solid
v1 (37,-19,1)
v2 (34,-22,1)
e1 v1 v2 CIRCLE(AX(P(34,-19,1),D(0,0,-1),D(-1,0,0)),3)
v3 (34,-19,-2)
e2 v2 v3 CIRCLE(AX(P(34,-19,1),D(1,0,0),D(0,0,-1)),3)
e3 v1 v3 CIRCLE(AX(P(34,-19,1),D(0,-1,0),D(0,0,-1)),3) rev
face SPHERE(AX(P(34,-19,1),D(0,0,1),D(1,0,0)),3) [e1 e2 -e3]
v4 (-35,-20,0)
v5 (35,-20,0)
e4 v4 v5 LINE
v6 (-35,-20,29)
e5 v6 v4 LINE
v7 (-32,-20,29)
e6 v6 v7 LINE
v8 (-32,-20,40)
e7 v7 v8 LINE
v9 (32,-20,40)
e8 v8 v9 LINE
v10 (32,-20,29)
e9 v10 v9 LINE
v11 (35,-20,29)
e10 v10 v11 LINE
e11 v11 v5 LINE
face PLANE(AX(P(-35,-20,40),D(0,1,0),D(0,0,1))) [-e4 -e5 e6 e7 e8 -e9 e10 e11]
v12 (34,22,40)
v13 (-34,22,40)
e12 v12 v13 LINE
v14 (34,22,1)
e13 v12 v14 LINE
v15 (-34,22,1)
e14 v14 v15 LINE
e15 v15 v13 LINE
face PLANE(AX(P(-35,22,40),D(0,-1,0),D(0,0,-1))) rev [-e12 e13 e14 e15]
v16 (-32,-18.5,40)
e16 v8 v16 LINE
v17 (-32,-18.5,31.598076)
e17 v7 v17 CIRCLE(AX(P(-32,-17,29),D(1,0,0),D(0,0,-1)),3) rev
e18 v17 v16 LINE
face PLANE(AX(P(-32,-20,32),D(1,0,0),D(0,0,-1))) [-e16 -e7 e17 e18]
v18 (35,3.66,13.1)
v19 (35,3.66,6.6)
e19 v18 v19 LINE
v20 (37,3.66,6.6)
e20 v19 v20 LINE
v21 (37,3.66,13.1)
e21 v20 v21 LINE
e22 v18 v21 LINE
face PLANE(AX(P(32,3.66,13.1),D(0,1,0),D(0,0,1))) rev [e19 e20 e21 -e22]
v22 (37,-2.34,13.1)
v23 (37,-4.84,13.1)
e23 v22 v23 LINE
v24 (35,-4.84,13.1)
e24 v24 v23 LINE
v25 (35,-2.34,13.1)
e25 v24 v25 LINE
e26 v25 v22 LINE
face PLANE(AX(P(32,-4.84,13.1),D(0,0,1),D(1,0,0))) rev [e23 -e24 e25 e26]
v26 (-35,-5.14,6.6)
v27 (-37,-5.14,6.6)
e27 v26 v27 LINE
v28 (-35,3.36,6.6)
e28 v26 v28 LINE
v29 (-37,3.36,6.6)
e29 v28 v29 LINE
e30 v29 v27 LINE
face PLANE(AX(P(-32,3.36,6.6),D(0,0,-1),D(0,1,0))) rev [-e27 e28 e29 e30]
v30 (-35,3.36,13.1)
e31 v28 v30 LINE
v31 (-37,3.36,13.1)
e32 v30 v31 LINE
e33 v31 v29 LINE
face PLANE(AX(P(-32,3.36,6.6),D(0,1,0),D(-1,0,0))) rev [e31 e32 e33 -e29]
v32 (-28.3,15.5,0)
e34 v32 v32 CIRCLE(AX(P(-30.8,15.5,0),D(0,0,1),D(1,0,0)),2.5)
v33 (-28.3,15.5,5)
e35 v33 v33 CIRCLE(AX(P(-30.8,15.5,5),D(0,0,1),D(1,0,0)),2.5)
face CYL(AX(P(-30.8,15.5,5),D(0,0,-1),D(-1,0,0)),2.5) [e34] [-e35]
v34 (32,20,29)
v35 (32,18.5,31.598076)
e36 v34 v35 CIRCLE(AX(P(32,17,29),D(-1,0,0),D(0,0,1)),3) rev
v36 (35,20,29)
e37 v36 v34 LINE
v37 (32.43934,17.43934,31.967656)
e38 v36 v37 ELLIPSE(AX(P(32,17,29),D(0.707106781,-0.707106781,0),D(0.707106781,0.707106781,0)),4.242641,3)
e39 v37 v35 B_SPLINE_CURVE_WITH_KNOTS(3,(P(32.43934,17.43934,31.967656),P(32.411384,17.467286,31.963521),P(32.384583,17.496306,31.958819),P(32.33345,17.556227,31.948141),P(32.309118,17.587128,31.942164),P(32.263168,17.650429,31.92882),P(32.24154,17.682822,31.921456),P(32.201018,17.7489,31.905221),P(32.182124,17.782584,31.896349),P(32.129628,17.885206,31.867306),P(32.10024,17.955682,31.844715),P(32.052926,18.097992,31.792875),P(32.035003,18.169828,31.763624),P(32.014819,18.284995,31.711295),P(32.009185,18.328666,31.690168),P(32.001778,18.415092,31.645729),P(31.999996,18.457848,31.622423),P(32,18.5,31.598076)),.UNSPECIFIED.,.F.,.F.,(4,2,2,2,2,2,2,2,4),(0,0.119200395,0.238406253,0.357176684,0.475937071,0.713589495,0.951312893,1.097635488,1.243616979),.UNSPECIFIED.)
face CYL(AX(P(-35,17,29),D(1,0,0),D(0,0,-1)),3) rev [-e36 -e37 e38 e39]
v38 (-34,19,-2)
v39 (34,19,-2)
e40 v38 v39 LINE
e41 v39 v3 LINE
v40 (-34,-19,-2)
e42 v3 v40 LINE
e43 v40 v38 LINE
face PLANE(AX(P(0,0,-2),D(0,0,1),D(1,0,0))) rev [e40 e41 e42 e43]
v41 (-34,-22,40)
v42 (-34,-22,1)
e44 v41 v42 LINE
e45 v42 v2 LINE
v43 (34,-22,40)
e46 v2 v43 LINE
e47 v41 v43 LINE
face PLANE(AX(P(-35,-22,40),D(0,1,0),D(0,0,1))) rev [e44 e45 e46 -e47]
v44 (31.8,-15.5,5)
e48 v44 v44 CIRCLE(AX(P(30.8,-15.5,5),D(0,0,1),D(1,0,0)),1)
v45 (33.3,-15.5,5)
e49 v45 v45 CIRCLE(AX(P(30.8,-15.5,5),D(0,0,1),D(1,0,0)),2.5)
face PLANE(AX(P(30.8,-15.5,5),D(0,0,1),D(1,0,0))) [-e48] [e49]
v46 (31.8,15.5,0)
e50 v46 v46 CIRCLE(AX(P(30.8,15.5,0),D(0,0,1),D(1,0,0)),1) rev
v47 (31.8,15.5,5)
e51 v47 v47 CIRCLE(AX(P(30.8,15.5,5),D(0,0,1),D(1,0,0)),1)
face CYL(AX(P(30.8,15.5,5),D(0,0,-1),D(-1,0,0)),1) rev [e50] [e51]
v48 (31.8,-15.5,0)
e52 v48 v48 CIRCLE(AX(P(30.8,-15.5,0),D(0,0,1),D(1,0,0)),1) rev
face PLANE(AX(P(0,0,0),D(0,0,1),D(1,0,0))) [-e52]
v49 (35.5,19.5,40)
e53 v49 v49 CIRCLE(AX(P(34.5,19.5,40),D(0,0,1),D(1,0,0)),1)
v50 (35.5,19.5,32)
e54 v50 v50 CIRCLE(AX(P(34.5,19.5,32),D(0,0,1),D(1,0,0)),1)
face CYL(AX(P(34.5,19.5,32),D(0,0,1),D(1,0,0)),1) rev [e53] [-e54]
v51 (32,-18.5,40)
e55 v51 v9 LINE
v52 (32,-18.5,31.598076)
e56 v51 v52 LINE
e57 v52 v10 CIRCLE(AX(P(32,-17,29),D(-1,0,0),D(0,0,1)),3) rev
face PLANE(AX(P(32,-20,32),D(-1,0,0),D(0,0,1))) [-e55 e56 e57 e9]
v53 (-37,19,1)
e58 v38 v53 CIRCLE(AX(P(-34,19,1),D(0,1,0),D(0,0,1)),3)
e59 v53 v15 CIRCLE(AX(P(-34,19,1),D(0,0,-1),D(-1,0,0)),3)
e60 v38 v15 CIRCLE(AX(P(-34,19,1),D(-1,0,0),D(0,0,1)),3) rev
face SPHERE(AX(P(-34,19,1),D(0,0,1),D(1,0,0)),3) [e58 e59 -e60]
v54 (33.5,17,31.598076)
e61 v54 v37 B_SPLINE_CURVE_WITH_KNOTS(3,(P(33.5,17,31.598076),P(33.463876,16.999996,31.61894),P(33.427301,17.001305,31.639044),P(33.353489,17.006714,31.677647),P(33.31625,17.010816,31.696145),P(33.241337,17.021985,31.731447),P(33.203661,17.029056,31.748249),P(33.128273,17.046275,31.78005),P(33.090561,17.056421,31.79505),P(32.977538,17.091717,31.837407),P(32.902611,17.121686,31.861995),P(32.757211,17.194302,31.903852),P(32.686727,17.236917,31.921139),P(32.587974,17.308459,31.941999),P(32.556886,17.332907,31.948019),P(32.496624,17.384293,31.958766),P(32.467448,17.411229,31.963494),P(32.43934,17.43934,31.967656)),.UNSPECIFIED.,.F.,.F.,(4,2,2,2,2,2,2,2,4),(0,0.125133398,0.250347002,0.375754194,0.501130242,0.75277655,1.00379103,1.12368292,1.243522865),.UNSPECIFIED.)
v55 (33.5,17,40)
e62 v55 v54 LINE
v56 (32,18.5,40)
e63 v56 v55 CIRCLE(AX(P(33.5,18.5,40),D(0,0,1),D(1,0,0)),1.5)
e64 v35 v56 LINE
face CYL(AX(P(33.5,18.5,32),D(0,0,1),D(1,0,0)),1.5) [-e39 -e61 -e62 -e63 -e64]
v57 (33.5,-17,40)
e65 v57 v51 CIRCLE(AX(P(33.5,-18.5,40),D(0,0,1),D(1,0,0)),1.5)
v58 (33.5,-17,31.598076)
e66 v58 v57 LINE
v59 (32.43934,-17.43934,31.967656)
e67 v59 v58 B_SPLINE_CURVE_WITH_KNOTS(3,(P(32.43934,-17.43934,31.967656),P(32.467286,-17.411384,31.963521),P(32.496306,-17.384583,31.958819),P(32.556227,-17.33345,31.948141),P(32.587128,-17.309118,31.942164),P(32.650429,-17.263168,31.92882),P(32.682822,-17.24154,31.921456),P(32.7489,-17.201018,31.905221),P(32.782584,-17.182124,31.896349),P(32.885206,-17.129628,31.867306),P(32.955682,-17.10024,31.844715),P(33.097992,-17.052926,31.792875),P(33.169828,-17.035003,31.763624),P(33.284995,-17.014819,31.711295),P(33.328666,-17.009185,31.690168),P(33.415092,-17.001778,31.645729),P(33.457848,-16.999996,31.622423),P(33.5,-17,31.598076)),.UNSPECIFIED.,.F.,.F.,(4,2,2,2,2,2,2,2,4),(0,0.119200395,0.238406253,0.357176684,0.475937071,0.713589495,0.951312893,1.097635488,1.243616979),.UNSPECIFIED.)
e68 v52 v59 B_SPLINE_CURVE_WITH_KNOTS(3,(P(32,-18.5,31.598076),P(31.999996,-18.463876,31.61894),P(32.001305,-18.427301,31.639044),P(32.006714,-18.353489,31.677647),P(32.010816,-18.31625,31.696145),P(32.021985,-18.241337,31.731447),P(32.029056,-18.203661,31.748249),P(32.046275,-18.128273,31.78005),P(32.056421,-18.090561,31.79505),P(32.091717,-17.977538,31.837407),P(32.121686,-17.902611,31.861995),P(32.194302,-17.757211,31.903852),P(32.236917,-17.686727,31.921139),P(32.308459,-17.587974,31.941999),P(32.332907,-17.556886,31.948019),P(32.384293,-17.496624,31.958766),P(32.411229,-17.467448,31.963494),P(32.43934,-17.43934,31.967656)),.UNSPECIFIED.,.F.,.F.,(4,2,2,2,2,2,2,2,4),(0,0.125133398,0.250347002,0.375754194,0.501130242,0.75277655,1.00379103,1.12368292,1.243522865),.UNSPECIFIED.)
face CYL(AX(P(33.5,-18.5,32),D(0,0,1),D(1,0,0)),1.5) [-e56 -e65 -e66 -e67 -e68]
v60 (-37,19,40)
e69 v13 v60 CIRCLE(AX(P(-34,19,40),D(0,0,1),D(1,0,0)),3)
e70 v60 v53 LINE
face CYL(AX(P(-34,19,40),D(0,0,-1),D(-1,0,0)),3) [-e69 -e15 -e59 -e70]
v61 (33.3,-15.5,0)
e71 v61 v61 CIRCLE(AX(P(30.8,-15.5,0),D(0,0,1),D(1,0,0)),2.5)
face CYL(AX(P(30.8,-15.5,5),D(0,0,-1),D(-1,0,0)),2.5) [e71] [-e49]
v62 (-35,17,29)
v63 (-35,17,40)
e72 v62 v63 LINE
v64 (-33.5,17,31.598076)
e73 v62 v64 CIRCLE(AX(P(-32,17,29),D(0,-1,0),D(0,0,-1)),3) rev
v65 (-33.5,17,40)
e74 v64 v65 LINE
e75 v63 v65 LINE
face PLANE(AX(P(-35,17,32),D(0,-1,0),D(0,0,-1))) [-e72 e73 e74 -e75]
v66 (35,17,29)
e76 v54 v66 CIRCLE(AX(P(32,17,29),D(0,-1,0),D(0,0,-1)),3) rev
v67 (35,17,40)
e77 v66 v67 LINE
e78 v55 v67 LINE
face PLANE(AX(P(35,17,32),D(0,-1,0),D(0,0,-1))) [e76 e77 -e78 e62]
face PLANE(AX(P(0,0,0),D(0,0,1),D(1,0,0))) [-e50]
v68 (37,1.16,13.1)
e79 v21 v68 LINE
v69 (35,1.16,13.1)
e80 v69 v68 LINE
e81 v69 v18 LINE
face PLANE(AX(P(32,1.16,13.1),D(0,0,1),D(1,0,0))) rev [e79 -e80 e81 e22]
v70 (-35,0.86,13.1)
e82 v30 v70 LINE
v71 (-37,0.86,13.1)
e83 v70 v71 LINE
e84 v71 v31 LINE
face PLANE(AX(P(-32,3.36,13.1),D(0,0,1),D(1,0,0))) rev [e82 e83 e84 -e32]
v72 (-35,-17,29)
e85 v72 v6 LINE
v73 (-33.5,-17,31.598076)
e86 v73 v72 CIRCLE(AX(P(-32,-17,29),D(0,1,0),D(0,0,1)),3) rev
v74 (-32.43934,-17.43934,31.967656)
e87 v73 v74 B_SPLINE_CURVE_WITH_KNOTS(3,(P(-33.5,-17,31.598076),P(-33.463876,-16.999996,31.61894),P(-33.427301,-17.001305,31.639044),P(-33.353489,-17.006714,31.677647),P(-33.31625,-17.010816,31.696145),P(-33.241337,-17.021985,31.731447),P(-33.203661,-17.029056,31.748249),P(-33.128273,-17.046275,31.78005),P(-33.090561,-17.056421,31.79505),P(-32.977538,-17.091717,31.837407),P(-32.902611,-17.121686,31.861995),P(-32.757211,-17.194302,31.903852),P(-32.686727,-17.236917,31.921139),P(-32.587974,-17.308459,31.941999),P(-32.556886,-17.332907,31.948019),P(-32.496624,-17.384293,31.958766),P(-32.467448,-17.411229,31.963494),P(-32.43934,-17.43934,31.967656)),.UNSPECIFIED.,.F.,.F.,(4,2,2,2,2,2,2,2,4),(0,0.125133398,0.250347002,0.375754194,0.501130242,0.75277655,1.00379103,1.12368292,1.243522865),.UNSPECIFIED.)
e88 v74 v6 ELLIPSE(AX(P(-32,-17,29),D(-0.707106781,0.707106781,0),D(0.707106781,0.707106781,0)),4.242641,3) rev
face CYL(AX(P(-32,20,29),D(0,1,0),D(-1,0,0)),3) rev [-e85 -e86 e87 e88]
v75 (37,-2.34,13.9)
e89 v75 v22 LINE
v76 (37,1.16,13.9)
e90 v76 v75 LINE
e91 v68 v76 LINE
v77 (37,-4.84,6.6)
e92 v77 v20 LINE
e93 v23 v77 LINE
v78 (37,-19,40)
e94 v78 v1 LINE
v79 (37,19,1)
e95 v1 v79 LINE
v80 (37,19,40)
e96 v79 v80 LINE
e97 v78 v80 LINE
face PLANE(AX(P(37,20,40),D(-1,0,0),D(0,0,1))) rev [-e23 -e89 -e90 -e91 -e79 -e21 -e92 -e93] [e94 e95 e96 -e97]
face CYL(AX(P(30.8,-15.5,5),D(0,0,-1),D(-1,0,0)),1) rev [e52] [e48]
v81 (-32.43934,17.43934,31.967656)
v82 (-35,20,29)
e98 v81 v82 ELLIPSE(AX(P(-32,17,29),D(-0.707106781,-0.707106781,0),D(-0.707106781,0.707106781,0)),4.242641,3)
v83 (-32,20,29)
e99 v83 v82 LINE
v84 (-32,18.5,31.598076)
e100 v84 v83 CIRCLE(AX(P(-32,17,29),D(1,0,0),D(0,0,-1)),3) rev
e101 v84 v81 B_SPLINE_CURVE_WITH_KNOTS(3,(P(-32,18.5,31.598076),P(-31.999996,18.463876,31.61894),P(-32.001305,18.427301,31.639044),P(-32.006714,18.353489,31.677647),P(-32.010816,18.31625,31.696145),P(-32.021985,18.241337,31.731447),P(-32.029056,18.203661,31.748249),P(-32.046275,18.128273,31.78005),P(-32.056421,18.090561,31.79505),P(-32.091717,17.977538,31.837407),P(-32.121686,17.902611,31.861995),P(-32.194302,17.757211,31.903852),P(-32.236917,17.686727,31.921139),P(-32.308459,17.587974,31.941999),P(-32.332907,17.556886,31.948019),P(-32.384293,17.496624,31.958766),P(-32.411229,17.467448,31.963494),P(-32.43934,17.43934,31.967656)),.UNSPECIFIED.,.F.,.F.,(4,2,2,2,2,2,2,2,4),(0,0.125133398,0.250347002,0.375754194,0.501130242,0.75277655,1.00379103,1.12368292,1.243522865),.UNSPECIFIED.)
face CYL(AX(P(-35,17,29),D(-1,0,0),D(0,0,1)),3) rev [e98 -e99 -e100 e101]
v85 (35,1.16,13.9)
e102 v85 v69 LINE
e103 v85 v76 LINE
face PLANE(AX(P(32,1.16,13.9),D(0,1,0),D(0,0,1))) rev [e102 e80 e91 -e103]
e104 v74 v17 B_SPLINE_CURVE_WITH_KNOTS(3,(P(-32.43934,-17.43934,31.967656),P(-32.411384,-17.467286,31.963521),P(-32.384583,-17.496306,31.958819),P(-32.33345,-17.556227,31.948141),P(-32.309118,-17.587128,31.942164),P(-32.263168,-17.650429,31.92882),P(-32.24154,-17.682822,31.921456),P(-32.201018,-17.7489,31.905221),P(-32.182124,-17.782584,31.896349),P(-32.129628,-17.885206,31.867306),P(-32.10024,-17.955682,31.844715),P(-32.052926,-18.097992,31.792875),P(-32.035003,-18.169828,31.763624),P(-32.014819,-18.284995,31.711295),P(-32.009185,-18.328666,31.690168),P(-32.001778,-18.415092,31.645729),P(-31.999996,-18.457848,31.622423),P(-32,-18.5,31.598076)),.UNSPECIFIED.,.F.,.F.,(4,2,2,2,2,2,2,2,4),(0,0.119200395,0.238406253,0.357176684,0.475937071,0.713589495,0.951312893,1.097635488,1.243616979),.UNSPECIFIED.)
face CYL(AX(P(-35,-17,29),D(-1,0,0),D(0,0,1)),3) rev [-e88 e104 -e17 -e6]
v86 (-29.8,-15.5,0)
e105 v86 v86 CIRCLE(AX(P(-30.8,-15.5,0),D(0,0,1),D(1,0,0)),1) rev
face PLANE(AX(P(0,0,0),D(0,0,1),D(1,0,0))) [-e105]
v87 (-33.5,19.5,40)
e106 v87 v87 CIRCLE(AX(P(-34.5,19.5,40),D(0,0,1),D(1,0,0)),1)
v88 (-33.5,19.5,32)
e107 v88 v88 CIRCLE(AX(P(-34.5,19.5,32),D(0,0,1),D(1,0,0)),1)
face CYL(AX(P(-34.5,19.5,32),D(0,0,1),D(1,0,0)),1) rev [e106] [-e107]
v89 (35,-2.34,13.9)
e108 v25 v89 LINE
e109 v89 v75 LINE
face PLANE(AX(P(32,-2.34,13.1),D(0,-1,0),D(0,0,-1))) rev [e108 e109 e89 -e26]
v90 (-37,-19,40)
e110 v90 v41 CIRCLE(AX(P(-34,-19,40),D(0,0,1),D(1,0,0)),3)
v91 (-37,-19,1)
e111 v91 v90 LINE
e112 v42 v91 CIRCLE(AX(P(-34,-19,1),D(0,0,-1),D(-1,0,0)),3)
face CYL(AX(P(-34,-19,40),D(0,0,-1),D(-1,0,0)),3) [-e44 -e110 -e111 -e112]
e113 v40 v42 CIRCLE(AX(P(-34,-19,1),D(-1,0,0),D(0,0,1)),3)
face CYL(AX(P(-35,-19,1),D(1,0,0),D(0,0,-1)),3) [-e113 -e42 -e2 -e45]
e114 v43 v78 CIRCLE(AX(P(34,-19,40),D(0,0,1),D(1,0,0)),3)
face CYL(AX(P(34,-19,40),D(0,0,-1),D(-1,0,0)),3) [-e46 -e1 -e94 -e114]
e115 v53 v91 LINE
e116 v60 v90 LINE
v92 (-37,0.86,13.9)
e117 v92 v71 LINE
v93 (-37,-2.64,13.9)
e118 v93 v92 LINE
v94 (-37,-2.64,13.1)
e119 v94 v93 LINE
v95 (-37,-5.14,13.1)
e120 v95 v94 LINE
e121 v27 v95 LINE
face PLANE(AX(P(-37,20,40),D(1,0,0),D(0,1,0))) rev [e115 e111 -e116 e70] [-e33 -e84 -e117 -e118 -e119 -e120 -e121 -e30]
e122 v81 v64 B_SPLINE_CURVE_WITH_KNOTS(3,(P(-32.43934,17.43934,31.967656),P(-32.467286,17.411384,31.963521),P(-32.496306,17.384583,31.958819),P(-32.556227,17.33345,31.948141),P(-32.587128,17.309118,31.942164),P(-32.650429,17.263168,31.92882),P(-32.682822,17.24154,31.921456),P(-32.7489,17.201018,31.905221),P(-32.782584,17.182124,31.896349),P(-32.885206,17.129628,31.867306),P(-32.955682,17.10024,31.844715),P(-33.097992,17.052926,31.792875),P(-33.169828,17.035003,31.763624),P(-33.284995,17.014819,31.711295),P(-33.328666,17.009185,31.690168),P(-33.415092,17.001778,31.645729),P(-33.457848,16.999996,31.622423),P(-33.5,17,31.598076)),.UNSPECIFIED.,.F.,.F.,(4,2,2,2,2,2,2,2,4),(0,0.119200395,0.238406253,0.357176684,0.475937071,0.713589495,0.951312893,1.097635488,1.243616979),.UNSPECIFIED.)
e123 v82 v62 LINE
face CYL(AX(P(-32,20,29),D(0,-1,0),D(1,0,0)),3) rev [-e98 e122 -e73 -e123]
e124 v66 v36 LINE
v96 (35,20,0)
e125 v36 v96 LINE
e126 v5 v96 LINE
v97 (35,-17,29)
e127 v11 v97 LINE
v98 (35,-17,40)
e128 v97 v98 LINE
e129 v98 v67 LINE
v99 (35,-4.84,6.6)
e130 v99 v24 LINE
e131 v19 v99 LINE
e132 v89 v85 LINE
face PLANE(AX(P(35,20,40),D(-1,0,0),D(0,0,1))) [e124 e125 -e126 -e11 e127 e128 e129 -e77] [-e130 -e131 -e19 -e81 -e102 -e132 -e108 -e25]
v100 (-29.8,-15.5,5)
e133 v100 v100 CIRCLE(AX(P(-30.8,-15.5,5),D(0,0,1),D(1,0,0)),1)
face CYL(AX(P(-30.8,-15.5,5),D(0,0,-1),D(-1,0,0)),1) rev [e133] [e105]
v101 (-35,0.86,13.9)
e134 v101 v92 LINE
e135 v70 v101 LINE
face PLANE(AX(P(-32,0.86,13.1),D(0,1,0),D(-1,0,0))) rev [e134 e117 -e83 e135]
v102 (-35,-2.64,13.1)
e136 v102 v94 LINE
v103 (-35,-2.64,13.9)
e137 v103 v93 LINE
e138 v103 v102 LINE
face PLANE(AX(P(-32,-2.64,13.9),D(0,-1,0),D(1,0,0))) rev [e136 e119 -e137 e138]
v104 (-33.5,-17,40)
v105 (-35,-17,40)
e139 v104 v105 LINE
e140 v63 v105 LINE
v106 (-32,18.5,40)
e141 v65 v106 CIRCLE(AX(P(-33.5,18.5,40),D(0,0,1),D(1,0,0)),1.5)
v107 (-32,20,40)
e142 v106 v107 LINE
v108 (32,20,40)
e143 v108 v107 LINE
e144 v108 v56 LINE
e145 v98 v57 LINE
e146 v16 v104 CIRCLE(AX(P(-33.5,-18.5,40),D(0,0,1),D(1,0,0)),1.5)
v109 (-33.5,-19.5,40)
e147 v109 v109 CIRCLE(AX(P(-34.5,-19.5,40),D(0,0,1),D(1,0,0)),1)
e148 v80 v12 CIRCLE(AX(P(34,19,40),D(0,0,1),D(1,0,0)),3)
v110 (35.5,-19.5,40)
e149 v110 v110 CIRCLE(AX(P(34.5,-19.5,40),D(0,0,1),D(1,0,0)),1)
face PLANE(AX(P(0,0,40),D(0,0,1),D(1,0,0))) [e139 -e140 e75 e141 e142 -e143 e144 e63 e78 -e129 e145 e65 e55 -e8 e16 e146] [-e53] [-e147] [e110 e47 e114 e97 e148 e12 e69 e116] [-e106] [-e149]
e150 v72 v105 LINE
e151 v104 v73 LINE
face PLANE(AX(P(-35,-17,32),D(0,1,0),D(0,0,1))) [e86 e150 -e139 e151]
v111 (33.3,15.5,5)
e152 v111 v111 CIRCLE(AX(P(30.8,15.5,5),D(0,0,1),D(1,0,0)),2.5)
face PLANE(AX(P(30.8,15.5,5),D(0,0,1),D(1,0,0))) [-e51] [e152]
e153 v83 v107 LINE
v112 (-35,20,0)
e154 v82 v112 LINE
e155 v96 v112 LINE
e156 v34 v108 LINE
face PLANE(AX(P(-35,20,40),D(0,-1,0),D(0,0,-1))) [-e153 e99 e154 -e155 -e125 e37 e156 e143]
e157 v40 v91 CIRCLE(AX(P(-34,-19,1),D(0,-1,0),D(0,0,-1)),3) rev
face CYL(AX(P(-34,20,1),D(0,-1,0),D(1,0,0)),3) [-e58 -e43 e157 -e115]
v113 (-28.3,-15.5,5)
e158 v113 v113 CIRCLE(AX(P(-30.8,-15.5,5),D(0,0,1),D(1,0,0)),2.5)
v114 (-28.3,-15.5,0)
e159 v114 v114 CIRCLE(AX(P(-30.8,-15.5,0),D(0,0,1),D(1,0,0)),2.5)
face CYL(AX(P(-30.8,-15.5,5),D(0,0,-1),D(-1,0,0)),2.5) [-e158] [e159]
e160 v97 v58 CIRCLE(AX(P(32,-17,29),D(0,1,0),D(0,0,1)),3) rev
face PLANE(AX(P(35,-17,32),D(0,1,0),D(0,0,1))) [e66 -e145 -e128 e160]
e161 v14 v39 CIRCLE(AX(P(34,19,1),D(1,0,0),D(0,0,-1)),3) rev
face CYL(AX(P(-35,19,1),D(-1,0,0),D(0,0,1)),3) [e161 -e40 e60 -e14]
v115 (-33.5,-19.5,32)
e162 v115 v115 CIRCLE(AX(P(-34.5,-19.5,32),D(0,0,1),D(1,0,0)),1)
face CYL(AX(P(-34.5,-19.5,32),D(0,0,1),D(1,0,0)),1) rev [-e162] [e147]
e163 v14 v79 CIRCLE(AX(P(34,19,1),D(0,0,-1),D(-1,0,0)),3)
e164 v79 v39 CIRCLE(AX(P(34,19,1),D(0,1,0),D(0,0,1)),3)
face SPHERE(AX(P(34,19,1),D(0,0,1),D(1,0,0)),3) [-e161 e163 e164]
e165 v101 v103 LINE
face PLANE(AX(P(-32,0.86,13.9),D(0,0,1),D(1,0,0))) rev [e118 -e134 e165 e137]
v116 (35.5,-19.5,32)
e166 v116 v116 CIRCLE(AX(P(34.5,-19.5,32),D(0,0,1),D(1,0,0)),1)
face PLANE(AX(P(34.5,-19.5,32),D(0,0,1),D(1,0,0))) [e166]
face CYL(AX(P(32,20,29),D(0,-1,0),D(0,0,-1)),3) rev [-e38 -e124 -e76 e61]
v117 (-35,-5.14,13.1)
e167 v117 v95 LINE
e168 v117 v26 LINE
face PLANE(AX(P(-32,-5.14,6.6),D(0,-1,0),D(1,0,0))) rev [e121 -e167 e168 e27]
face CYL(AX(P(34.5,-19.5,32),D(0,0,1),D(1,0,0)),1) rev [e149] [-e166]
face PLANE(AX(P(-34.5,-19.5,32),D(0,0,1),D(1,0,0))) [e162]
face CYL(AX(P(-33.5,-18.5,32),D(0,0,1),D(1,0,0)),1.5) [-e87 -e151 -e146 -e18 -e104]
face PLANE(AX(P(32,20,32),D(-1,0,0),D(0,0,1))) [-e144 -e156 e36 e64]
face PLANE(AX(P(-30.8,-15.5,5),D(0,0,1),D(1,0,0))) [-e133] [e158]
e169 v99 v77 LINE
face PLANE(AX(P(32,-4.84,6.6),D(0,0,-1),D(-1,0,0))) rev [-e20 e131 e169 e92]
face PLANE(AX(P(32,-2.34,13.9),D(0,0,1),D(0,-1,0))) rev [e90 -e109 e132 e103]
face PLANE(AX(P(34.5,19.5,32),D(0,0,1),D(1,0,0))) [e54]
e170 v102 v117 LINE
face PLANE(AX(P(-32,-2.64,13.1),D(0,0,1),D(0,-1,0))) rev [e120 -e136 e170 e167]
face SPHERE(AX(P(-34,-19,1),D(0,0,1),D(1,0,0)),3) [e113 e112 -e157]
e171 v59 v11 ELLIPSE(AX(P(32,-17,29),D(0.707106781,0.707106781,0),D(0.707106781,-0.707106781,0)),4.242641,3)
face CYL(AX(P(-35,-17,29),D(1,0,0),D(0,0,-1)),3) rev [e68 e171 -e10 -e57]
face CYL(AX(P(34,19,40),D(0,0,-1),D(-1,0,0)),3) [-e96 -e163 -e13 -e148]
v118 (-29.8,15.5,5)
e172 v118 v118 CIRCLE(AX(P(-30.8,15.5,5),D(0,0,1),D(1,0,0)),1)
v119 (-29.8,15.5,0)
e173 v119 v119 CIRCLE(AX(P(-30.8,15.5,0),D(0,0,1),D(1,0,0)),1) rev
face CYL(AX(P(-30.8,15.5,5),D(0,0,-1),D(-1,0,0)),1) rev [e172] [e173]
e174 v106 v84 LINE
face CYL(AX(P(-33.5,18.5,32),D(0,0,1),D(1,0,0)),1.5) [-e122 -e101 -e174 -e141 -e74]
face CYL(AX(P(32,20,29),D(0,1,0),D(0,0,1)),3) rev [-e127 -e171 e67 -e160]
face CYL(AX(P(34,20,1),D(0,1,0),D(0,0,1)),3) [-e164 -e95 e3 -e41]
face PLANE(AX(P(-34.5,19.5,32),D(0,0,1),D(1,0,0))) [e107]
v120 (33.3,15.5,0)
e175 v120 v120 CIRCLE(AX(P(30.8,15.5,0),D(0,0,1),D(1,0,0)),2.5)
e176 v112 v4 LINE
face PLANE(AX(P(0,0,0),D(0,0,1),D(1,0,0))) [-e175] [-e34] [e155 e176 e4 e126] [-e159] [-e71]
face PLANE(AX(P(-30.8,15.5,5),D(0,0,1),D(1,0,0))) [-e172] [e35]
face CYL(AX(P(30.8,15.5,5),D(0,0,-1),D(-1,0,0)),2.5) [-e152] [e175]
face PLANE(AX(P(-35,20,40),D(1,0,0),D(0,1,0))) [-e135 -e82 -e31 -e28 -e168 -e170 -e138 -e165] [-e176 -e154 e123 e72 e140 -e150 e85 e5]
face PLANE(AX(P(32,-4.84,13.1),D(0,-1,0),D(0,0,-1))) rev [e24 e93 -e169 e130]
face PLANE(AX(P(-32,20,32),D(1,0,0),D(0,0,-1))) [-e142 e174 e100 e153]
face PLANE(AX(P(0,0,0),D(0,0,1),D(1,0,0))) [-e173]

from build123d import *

# Parameters (mm, degrees)
IZIM1_W                     = 70
IZIM1_H                     = 40
Y_KSEKLIK_EKSTR_ZYON1_DEPTH = 40
BO_ALTMA2_T                 = 2
IZIM2_R                     = 2.5
IZIM2_R_2                   = 1
Y_KSEKLIK_EKSTR_ZYON2_DEPTH = 5
RADYUS2_R                   = 3
KES_EKSTR_ZYON1_DEPTH       = 5
KES_EKSTR_ZYON2_DEPTH       = 5
IZIM5_W                     = 3
IZIM5_H                     = 3
Y_KSEKLIK_EKSTR_ZYON3_DEPTH = 8
RADYUS3_R                   = 3
IZIM6_R                     = 1
KES_EKSTR_ZYON3_DEPTH       = 8
RADYUS4_R                   = 1.5


# Some blends are built 0.0001 mm under size
with BuildPart() as part:
    # Çizim1 → Yükseklik-Ekstrüzyon1 (new body)
    with BuildSketch(Plane.XY):
        Rectangle(IZIM1_W, IZIM1_H)
    extrude(amount=Y_KSEKLIK_EKSTR_ZYON1_DEPTH)

    # İç Boşaltma2
    bo_altma2_openings = [part.faces().sort_by_distance(p)[0] for p in [
        (0, 0, 40),
    ]]
    offset(amount=BO_ALTMA2_T, openings=bo_altma2_openings, kind=Kind.INTERSECTION)

    # Çizim2 → Yükseklik-Ekstrüzyon2 (add)
    # profile 1 of 4: a face of its own
    with BuildSketch(Plane.XY):
        with Locations((-30.8, 15.5)):
            Circle(IZIM2_R)
        with Locations((-30.8, 15.5)):
            Circle(IZIM2_R_2, mode=Mode.SUBTRACT)
    # profile 2 of 4: a face of its own
    with BuildSketch(Plane.XY):
        with Locations((-30.8, -15.5)):
            Circle(IZIM2_R)
        with Locations((-30.8, -15.5)):
            Circle(IZIM2_R_2, mode=Mode.SUBTRACT)
    # profile 3 of 4: a face of its own
    with BuildSketch(Plane.XY):
        with Locations((30.8, -15.5)):
            Circle(IZIM2_R)
        with Locations((30.8, -15.5)):
            Circle(IZIM2_R_2, mode=Mode.SUBTRACT)
    # profile 4 of 4: a face of its own
    with BuildSketch(Plane.XY):
        with Locations((30.8, 15.5)):
            Circle(IZIM2_R)
        with Locations((30.8, 15.5)):
            Circle(IZIM2_R_2, mode=Mode.SUBTRACT)
    extrude(amount=Y_KSEKLIK_EKSTR_ZYON2_DEPTH)

    # Radyus2
    radyus2_edges = [part.edges().sort_by_distance(p)[0] for p in [
        (0, -22, -2),
        (-37, 0, -2),
        (0, 22, -2),
        (37, 0, -2),
        (37, -22, 19),
        (-37, -22, 19),
        (-37, 22, 19),
        (37, 22, 19),
    ]]
    fillet(radyus2_edges, radius=RADYUS2_R)

    # Çizim3 → Kes-Ekstrüzyon1 (cut)
    with BuildSketch(Plane.ZY.offset(37)):
        Polygon((6.6, 3.36), (13.1, 3.36), (13.1, 0.86), (13.9, 0.86), (13.9, -2.64), (13.1, -2.64), (13.1, -5.14), (6.6, -5.14), align=None)
    extrude(amount=-KES_EKSTR_ZYON1_DEPTH, mode=Mode.SUBTRACT)

    # Çizim4 → Kes-Ekstrüzyon2 (cut)
    with BuildSketch(Plane(origin=(37, 0, 0), x_dir=(0, 0, -1), z_dir=(1, 0, 0))):
        Polygon((-13.1, -2.34), (-13.9, -2.34), (-13.9, 1.16), (-13.1, 1.16), (-13.1, 3.66), (-6.6, 3.66), (-6.6, -4.84), (-13.1, -4.84), align=None)
    extrude(amount=-KES_EKSTR_ZYON2_DEPTH, mode=Mode.SUBTRACT)

    # Çizim5 → Yükseklik-Ekstrüzyon3 (add)
    with BuildSketch(Plane.XY.offset(40)):
        with Locations((-33.5, 18.5)):
            Rectangle(IZIM5_W, IZIM5_H)
        with Locations((-33.5, -18.5)):
            Rectangle(IZIM5_W, IZIM5_H)
        with Locations((33.5, 18.5)):
            Rectangle(IZIM5_W, IZIM5_H)
        with Locations((33.5, -18.5)):
            Rectangle(IZIM5_W, IZIM5_H)
    extrude(amount=-Y_KSEKLIK_EKSTR_ZYON3_DEPTH)

    # Radyus3
    radyus3_edges = [part.edges().sort_by_distance(p)[0] for p in [
        (33.5, 20, 32),
        (35, 18.5, 32),
        (33.5, -20, 32),
        (35, -18.5, 32),
        (-35, -18.5, 32),
        (-33.5, -20, 32),
        (-33.5, 20, 32),
        (-35, 18.5, 32),
    ]]
    fillet(radyus3_edges, radius=RADYUS3_R - 0.0001)  # a hair under: the kernel refuses the full size

    # Çizim6 → Kes-Ekstrüzyon3 (cut)
    with BuildSketch(Plane.XY.offset(40)):
        with Locations((-34.5, 19.5)):
            Circle(IZIM6_R)
        with Locations((-34.5, -19.5)):
            Circle(IZIM6_R)
        with Locations((34.5, -19.5)):
            Circle(IZIM6_R)
        with Locations((34.5, 19.5)):
            Circle(IZIM6_R)
    extrude(amount=-KES_EKSTR_ZYON3_DEPTH, mode=Mode.SUBTRACT)

    # Radyus4
    # the kernel refuses this fillet: 1.5 mm, written as the material it takes off along each edge
    with BuildSketch(Plane(origin=(-32, -17, 43.75), x_dir=(-1, 0, 0), z_dir=(0, 0, -1)), Plane(origin=(-32, 17, 43.75), x_dir=(0, 1, 0), z_dir=(0, 0, -1))) as radyus4_piece_1:
        with BuildLine():
            CenterArc((RADYUS4_R, -RADYUS4_R), RADYUS4_R, 90, 90)
            Line((0, -RADYUS4_R), (0, 0))
            Line((0, 0), (RADYUS4_R, 0))
        make_face()
    extrude(amount=15.5, mode=Mode.SUBTRACT)
    with BuildSketch(Plane(origin=(32, -17, 43.75), x_dir=(1, 0, 0), z_dir=(0, 0, -1)), Plane(origin=(32, 17, 43.75), x_dir=(0, 1, 0), z_dir=(0, 0, -1))) as radyus4_piece_2:
        with BuildLine():
            CenterArc((RADYUS4_R, RADYUS4_R), RADYUS4_R, 180, 90)
            Line((0, RADYUS4_R), (0, 0))
            Line((0, 0), (RADYUS4_R, 0))
        make_face()
    extrude(amount=15.5, mode=Mode.SUBTRACT)


solid = part.part
